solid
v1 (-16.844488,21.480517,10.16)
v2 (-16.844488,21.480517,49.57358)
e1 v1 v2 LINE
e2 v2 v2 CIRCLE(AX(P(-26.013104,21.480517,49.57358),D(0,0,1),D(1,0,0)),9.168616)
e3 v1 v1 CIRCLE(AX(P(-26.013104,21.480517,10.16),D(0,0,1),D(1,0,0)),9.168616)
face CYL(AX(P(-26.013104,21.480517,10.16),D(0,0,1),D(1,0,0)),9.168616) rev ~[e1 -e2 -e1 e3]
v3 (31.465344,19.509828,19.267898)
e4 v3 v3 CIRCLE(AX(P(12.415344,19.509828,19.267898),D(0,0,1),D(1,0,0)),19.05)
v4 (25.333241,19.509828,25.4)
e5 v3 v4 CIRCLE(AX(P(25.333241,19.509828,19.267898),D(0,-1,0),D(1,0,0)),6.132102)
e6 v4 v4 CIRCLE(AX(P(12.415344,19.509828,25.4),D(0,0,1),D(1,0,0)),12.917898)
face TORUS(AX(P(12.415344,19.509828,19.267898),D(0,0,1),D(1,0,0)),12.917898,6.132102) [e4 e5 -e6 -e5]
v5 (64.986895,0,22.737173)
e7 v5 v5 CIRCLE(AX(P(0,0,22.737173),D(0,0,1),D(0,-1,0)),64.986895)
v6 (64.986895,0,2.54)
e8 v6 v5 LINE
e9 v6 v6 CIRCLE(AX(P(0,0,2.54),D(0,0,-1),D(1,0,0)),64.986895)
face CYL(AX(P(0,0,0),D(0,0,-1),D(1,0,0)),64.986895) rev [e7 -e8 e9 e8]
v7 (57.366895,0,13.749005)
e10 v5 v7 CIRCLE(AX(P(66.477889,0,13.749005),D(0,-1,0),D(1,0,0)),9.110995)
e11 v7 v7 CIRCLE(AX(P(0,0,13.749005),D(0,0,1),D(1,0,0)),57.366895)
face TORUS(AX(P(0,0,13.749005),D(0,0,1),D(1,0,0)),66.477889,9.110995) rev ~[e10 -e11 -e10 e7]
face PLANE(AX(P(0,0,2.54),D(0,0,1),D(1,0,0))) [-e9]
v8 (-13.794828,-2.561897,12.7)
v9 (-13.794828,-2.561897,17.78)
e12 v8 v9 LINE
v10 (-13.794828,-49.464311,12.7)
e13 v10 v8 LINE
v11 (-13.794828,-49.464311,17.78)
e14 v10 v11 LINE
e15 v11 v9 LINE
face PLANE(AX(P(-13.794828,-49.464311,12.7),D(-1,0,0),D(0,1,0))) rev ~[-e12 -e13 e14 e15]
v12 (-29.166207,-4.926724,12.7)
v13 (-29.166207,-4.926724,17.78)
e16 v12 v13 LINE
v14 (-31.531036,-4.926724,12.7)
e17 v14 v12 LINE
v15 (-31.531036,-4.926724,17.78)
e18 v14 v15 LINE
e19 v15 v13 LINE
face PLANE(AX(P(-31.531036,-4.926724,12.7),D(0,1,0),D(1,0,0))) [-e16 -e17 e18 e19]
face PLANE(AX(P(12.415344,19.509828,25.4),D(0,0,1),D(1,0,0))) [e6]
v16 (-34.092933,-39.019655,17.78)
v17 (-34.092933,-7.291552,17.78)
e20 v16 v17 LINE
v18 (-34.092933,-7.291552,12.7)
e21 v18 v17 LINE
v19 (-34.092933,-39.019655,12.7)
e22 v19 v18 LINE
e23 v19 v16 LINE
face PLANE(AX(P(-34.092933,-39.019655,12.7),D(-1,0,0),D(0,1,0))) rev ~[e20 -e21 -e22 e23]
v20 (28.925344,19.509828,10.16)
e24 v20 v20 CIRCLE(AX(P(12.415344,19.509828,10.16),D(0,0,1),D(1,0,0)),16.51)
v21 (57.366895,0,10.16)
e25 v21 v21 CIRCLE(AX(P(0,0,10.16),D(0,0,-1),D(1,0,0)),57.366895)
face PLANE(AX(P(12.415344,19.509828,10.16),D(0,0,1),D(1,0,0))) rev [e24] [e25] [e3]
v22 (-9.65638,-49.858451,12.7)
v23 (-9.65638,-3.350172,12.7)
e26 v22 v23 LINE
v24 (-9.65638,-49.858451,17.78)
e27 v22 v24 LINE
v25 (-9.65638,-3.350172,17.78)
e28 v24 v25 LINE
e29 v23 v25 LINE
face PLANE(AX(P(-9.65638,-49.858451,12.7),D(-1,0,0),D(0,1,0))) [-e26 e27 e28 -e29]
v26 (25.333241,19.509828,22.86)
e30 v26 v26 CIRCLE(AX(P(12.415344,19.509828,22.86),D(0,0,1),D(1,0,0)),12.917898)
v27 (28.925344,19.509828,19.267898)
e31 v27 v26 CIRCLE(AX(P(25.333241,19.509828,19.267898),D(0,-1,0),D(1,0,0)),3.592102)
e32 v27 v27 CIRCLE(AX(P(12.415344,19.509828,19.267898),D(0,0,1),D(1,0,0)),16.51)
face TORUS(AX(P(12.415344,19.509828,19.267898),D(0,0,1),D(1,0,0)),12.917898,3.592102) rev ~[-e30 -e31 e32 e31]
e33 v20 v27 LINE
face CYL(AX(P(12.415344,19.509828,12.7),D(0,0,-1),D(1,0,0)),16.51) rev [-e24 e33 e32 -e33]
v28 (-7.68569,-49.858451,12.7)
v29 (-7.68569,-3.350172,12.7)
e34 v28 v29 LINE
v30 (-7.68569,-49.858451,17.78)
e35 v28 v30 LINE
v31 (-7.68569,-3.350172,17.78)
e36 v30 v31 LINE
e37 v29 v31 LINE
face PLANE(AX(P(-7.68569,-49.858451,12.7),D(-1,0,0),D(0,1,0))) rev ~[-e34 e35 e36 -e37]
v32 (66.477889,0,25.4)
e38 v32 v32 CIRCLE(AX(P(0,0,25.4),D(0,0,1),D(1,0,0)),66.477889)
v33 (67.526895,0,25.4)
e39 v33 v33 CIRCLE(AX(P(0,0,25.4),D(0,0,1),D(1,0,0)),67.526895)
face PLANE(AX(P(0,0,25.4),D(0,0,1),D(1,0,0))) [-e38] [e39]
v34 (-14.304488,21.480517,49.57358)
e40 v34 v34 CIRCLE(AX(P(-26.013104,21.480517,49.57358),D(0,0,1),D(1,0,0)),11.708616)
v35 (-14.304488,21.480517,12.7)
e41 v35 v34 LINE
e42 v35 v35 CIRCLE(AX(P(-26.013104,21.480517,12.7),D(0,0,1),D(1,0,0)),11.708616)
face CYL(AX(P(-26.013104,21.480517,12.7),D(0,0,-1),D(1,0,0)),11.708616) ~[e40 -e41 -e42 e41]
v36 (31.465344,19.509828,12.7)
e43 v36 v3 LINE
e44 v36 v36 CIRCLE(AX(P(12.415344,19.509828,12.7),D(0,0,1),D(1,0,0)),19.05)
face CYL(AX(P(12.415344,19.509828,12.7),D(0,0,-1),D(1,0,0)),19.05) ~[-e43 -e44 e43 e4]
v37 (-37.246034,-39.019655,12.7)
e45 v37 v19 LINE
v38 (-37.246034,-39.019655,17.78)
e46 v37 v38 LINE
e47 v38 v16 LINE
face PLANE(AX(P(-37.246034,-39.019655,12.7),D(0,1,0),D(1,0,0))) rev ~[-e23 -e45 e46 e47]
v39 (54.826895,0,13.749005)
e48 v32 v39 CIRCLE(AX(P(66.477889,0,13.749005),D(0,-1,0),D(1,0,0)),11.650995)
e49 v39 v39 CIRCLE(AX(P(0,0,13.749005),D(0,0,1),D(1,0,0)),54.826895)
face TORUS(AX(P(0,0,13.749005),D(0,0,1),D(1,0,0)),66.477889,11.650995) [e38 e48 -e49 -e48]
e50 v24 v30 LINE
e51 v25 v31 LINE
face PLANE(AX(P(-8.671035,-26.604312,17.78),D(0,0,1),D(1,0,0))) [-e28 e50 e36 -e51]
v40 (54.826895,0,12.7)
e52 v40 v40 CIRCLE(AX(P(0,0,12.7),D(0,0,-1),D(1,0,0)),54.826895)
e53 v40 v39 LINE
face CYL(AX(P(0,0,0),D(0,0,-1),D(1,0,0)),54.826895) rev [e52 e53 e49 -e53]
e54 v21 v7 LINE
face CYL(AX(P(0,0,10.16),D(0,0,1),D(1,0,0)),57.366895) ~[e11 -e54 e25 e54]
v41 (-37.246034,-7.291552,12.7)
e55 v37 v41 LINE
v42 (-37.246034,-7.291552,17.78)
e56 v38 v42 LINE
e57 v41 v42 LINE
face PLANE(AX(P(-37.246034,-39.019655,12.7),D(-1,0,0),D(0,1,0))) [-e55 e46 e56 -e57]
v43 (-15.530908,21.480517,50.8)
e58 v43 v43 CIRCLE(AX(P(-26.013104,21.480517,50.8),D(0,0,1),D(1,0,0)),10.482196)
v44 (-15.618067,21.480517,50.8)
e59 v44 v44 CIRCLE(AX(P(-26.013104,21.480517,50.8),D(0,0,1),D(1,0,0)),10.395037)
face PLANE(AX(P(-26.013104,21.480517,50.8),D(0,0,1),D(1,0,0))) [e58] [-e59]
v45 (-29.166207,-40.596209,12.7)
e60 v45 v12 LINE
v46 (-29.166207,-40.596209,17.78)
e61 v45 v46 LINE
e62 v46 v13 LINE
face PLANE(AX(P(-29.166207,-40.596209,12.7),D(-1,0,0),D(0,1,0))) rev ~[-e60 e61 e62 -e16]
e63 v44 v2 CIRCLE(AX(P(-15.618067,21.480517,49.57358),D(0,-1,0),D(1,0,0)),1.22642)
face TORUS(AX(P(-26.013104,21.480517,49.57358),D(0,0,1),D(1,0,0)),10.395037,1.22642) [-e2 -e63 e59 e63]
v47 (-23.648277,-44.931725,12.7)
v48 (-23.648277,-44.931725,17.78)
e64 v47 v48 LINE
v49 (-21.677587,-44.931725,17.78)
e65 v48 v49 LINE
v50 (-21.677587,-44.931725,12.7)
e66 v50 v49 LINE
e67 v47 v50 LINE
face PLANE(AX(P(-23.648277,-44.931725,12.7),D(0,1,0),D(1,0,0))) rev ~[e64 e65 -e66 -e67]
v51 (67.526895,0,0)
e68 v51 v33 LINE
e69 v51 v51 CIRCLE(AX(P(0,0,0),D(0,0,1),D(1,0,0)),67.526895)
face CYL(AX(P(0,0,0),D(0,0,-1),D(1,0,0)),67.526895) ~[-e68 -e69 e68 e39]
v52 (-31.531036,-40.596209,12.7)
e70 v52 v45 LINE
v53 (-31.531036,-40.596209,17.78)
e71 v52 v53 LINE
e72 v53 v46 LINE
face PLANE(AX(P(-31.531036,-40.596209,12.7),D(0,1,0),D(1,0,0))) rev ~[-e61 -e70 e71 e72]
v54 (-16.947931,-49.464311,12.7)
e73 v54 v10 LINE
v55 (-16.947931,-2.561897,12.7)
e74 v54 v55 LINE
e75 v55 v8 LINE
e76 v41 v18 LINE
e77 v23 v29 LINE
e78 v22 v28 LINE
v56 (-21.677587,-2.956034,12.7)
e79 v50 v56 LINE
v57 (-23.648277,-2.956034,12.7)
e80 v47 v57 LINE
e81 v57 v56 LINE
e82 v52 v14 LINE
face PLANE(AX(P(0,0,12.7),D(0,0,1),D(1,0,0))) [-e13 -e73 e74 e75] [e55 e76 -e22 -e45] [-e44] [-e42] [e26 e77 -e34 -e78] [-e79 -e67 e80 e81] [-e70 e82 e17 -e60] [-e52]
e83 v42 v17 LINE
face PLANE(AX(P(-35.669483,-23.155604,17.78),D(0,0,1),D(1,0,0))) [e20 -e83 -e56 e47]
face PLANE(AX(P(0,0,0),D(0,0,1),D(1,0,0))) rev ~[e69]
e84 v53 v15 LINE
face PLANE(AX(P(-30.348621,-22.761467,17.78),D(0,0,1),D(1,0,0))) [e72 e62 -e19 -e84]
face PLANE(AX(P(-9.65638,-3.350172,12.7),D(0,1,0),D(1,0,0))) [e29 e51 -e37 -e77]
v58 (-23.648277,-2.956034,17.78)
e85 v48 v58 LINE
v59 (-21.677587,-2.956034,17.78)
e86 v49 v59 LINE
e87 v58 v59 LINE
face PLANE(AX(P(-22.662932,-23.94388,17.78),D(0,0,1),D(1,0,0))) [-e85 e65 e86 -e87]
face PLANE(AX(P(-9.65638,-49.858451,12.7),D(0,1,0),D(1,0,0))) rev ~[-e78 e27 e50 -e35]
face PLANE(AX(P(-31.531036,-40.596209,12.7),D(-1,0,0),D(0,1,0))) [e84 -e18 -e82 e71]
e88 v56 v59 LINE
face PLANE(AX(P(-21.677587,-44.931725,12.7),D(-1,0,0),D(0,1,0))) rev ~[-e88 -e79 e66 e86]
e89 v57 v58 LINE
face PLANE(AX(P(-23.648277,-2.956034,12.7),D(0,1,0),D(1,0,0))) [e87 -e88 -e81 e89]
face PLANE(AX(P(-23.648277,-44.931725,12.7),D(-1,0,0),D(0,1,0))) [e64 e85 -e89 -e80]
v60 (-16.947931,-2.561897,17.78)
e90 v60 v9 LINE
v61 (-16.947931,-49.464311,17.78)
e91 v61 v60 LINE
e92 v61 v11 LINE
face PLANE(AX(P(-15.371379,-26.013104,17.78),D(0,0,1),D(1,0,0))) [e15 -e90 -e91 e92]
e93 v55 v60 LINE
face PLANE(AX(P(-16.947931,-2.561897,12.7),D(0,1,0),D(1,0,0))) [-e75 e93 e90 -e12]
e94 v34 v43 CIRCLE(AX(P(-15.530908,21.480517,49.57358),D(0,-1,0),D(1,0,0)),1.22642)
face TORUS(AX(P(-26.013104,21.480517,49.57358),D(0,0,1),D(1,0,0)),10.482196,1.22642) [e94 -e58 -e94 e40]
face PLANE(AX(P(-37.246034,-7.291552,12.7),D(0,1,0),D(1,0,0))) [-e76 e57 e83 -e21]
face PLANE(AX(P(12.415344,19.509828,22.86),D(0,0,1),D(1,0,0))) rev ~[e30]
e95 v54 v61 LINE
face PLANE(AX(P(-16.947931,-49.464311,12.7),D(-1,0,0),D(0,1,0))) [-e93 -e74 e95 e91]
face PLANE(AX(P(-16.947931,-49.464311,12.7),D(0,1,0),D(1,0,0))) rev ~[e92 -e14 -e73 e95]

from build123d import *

# Parameters (mm, degrees)
F0_R      = 67.5268946045
F1_DEPTH  = 25.4
F2_T      = -12.7
F3_R      = 11.650994652
F4_R      = 19.05
F5_DEPTH  = 12.7
F6_R      = 6.1321024484
F8_R      = 11.7086164589
F9_DEPTH  = 38.1
F10_T     = 2.54
F11_R     = 1.2264204897
F7_W      = 3.1531006098
F7_H      = 31.7281037569
F7_W_2    = 2.3648291826
F7_H_2    = 35.6694851071
F7_W_3    = 1.9706897438
F7_H_3    = 41.9756902847
F7_W_4    = 3.1531024724
F7_H_4    = 46.902414877
F7_W_5    = 1.9706902094
F7_H_5    = 46.5082784649
F12_DEPTH = 5.08


# Not quite as in the source:
# - a shell that OpenCascade refuses in one call is made with other operations: the cavity is built on its own and cut out


with BuildPart() as f1:
    # F0 (on Top) → F1 (new body)
    with BuildSketch(Plane.XY):
        Circle(F0_R)
    extrude(amount=F1_DEPTH)

    # F2
    f2_openings = [f1.faces().sort_by_distance(p)[0] for p in [
        (0, 0, 25.4),
    ]]
    offset(amount=F2_T, openings=f2_openings)

    # F3
    f3_edges = [f1.edges().sort_by_distance(p)[0] for p in [
        (-54.826895, 0, 25.4),
    ]]
    fillet(f3_edges, radius=F3_R)

    # F4 (on face) → F5 (join)
    with BuildSketch(Plane.XY.offset(12.7)):
        with Locations((12.4153438956, 19.5098277181)):
            Circle(F4_R)
    extrude(amount=F5_DEPTH)

    # F6
    f6_edges = [f1.edges().sort_by_distance(p)[0] for p in [
        (-6.634656, 19.509828, 25.4),
    ]]
    fillet(f6_edges, radius=F6_R)

    # F8 (on face) → F9 (join)
    with BuildSketch(Plane.XY.offset(12.7)):
        with Locations((-26.0131042451, 21.4805174619)):
            Circle(F8_R)
    extrude(amount=F9_DEPTH)

    # F10: shell of thickness 2.54, made by hand


with BuildPart() as f10_core1:
    # F10_t2: copy of F1
    add(f1.part)

    # the walls: a layer under each face that stays
    f10_faces = [f10_core1.faces().sort_by_distance(p)[0] for p in [
        (-6.6346561044, 19.5098277181, 15.9839487758),
        (-4.8386048802, 19.5098277181, 23.6039487758),
        (0, 0, 12.7),
        (12.4153438956, 19.5098277181, 25.4),
        (-54.8268946045, 0, 13.224502674),
        (-37.721720704, 21.4805174619, 31.75),
        (-58.2393919305, 0, 21.987502674),
        (59.0860327789, -32.512949254, 25.4),
        (-67.5268946045, 0, 12.7),
        (0, 0, 0),
    ]]
    thicken(f10_faces, amount=-F10_T, mode=Mode.SUBTRACT)

    # F10_s3 → F10_t4 (revolve, cut)
    with BuildSketch(Plane.XZ.offset(-19.5098277181)):
        Polygon((31.4907438956, 12.7254), (28.9253438956, 12.7), (28.9253438956, 10.16), (31.4653438956, 10.16), align=None)
    revolve(axis=Axis((12.4153438956, 19.5098277181, 12.7), (0, 0, 1)), mode=Mode.SUBTRACT)

    # F10_s5 → F10_t6 (revolve, cut)
    with BuildSketch(Plane.XZ):
        Polygon((54.8014946045, 12.7254), (54.8268946045, 10.16), (57.3668946045, 10.16), (57.3668946045, 12.7), align=None)
    revolve(axis=Axis((0, 0, 12.7), (0, 0, -1)), mode=Mode.SUBTRACT)

    # F10_s7 → F10_t8 (revolve, cut)
    with BuildSketch(Plane.XZ.offset(-21.4805174619)):
        Polygon((-14.2790877862, 12.7254), (-14.3044877862, 10.16), (-16.8444877862, 10.16), (-16.8444877862, 12.7), align=None)
    revolve(axis=Axis((-26.0131042451, 21.4805174619, 12.7), (0, 0, 1)), mode=Mode.SUBTRACT)


with BuildPart() as f1_1:
    add(f1.part)

    # what is left inside the walls is the cavity
    f10_cavity = [f10_core1.part.solids().sort_by_distance(p)[0] for p in [
        (0, -21.662298, 2.5654),
    ]]
    add(f10_cavity, mode=Mode.SUBTRACT)

    # F11
    f11_edges = [f1_1.edges().sort_by_distance(p)[0] for p in [
        (-37.721721, 21.480517, 50.8),
        (-35.181721, 21.480517, 50.8),
    ]]
    fillet(f11_edges, radius=F11_R)

    # F7 (on face) → F12 (join)
    with BuildSketch(Plane.XY.offset(12.7)):
        with Locations((-35.6694832444, -23.1556035578)):
            Rectangle(F7_W, F7_H)
        with Locations((-30.3486213088, -22.7614669129)):
            Rectangle(F7_W_2, F7_H_2)
        with Locations((-22.6629320532, -23.9438795252)):
            Rectangle(F7_W_3, F7_H_3)
        with Locations((-15.3713794425, -26.0131040122)):
            Rectangle(F7_W_4, F7_H_4)
        with Locations((-8.671034826, -26.6043116571)):
            Rectangle(F7_W_5, F7_H_5)
    extrude(amount=F12_DEPTH)


solid = f1_1.part
